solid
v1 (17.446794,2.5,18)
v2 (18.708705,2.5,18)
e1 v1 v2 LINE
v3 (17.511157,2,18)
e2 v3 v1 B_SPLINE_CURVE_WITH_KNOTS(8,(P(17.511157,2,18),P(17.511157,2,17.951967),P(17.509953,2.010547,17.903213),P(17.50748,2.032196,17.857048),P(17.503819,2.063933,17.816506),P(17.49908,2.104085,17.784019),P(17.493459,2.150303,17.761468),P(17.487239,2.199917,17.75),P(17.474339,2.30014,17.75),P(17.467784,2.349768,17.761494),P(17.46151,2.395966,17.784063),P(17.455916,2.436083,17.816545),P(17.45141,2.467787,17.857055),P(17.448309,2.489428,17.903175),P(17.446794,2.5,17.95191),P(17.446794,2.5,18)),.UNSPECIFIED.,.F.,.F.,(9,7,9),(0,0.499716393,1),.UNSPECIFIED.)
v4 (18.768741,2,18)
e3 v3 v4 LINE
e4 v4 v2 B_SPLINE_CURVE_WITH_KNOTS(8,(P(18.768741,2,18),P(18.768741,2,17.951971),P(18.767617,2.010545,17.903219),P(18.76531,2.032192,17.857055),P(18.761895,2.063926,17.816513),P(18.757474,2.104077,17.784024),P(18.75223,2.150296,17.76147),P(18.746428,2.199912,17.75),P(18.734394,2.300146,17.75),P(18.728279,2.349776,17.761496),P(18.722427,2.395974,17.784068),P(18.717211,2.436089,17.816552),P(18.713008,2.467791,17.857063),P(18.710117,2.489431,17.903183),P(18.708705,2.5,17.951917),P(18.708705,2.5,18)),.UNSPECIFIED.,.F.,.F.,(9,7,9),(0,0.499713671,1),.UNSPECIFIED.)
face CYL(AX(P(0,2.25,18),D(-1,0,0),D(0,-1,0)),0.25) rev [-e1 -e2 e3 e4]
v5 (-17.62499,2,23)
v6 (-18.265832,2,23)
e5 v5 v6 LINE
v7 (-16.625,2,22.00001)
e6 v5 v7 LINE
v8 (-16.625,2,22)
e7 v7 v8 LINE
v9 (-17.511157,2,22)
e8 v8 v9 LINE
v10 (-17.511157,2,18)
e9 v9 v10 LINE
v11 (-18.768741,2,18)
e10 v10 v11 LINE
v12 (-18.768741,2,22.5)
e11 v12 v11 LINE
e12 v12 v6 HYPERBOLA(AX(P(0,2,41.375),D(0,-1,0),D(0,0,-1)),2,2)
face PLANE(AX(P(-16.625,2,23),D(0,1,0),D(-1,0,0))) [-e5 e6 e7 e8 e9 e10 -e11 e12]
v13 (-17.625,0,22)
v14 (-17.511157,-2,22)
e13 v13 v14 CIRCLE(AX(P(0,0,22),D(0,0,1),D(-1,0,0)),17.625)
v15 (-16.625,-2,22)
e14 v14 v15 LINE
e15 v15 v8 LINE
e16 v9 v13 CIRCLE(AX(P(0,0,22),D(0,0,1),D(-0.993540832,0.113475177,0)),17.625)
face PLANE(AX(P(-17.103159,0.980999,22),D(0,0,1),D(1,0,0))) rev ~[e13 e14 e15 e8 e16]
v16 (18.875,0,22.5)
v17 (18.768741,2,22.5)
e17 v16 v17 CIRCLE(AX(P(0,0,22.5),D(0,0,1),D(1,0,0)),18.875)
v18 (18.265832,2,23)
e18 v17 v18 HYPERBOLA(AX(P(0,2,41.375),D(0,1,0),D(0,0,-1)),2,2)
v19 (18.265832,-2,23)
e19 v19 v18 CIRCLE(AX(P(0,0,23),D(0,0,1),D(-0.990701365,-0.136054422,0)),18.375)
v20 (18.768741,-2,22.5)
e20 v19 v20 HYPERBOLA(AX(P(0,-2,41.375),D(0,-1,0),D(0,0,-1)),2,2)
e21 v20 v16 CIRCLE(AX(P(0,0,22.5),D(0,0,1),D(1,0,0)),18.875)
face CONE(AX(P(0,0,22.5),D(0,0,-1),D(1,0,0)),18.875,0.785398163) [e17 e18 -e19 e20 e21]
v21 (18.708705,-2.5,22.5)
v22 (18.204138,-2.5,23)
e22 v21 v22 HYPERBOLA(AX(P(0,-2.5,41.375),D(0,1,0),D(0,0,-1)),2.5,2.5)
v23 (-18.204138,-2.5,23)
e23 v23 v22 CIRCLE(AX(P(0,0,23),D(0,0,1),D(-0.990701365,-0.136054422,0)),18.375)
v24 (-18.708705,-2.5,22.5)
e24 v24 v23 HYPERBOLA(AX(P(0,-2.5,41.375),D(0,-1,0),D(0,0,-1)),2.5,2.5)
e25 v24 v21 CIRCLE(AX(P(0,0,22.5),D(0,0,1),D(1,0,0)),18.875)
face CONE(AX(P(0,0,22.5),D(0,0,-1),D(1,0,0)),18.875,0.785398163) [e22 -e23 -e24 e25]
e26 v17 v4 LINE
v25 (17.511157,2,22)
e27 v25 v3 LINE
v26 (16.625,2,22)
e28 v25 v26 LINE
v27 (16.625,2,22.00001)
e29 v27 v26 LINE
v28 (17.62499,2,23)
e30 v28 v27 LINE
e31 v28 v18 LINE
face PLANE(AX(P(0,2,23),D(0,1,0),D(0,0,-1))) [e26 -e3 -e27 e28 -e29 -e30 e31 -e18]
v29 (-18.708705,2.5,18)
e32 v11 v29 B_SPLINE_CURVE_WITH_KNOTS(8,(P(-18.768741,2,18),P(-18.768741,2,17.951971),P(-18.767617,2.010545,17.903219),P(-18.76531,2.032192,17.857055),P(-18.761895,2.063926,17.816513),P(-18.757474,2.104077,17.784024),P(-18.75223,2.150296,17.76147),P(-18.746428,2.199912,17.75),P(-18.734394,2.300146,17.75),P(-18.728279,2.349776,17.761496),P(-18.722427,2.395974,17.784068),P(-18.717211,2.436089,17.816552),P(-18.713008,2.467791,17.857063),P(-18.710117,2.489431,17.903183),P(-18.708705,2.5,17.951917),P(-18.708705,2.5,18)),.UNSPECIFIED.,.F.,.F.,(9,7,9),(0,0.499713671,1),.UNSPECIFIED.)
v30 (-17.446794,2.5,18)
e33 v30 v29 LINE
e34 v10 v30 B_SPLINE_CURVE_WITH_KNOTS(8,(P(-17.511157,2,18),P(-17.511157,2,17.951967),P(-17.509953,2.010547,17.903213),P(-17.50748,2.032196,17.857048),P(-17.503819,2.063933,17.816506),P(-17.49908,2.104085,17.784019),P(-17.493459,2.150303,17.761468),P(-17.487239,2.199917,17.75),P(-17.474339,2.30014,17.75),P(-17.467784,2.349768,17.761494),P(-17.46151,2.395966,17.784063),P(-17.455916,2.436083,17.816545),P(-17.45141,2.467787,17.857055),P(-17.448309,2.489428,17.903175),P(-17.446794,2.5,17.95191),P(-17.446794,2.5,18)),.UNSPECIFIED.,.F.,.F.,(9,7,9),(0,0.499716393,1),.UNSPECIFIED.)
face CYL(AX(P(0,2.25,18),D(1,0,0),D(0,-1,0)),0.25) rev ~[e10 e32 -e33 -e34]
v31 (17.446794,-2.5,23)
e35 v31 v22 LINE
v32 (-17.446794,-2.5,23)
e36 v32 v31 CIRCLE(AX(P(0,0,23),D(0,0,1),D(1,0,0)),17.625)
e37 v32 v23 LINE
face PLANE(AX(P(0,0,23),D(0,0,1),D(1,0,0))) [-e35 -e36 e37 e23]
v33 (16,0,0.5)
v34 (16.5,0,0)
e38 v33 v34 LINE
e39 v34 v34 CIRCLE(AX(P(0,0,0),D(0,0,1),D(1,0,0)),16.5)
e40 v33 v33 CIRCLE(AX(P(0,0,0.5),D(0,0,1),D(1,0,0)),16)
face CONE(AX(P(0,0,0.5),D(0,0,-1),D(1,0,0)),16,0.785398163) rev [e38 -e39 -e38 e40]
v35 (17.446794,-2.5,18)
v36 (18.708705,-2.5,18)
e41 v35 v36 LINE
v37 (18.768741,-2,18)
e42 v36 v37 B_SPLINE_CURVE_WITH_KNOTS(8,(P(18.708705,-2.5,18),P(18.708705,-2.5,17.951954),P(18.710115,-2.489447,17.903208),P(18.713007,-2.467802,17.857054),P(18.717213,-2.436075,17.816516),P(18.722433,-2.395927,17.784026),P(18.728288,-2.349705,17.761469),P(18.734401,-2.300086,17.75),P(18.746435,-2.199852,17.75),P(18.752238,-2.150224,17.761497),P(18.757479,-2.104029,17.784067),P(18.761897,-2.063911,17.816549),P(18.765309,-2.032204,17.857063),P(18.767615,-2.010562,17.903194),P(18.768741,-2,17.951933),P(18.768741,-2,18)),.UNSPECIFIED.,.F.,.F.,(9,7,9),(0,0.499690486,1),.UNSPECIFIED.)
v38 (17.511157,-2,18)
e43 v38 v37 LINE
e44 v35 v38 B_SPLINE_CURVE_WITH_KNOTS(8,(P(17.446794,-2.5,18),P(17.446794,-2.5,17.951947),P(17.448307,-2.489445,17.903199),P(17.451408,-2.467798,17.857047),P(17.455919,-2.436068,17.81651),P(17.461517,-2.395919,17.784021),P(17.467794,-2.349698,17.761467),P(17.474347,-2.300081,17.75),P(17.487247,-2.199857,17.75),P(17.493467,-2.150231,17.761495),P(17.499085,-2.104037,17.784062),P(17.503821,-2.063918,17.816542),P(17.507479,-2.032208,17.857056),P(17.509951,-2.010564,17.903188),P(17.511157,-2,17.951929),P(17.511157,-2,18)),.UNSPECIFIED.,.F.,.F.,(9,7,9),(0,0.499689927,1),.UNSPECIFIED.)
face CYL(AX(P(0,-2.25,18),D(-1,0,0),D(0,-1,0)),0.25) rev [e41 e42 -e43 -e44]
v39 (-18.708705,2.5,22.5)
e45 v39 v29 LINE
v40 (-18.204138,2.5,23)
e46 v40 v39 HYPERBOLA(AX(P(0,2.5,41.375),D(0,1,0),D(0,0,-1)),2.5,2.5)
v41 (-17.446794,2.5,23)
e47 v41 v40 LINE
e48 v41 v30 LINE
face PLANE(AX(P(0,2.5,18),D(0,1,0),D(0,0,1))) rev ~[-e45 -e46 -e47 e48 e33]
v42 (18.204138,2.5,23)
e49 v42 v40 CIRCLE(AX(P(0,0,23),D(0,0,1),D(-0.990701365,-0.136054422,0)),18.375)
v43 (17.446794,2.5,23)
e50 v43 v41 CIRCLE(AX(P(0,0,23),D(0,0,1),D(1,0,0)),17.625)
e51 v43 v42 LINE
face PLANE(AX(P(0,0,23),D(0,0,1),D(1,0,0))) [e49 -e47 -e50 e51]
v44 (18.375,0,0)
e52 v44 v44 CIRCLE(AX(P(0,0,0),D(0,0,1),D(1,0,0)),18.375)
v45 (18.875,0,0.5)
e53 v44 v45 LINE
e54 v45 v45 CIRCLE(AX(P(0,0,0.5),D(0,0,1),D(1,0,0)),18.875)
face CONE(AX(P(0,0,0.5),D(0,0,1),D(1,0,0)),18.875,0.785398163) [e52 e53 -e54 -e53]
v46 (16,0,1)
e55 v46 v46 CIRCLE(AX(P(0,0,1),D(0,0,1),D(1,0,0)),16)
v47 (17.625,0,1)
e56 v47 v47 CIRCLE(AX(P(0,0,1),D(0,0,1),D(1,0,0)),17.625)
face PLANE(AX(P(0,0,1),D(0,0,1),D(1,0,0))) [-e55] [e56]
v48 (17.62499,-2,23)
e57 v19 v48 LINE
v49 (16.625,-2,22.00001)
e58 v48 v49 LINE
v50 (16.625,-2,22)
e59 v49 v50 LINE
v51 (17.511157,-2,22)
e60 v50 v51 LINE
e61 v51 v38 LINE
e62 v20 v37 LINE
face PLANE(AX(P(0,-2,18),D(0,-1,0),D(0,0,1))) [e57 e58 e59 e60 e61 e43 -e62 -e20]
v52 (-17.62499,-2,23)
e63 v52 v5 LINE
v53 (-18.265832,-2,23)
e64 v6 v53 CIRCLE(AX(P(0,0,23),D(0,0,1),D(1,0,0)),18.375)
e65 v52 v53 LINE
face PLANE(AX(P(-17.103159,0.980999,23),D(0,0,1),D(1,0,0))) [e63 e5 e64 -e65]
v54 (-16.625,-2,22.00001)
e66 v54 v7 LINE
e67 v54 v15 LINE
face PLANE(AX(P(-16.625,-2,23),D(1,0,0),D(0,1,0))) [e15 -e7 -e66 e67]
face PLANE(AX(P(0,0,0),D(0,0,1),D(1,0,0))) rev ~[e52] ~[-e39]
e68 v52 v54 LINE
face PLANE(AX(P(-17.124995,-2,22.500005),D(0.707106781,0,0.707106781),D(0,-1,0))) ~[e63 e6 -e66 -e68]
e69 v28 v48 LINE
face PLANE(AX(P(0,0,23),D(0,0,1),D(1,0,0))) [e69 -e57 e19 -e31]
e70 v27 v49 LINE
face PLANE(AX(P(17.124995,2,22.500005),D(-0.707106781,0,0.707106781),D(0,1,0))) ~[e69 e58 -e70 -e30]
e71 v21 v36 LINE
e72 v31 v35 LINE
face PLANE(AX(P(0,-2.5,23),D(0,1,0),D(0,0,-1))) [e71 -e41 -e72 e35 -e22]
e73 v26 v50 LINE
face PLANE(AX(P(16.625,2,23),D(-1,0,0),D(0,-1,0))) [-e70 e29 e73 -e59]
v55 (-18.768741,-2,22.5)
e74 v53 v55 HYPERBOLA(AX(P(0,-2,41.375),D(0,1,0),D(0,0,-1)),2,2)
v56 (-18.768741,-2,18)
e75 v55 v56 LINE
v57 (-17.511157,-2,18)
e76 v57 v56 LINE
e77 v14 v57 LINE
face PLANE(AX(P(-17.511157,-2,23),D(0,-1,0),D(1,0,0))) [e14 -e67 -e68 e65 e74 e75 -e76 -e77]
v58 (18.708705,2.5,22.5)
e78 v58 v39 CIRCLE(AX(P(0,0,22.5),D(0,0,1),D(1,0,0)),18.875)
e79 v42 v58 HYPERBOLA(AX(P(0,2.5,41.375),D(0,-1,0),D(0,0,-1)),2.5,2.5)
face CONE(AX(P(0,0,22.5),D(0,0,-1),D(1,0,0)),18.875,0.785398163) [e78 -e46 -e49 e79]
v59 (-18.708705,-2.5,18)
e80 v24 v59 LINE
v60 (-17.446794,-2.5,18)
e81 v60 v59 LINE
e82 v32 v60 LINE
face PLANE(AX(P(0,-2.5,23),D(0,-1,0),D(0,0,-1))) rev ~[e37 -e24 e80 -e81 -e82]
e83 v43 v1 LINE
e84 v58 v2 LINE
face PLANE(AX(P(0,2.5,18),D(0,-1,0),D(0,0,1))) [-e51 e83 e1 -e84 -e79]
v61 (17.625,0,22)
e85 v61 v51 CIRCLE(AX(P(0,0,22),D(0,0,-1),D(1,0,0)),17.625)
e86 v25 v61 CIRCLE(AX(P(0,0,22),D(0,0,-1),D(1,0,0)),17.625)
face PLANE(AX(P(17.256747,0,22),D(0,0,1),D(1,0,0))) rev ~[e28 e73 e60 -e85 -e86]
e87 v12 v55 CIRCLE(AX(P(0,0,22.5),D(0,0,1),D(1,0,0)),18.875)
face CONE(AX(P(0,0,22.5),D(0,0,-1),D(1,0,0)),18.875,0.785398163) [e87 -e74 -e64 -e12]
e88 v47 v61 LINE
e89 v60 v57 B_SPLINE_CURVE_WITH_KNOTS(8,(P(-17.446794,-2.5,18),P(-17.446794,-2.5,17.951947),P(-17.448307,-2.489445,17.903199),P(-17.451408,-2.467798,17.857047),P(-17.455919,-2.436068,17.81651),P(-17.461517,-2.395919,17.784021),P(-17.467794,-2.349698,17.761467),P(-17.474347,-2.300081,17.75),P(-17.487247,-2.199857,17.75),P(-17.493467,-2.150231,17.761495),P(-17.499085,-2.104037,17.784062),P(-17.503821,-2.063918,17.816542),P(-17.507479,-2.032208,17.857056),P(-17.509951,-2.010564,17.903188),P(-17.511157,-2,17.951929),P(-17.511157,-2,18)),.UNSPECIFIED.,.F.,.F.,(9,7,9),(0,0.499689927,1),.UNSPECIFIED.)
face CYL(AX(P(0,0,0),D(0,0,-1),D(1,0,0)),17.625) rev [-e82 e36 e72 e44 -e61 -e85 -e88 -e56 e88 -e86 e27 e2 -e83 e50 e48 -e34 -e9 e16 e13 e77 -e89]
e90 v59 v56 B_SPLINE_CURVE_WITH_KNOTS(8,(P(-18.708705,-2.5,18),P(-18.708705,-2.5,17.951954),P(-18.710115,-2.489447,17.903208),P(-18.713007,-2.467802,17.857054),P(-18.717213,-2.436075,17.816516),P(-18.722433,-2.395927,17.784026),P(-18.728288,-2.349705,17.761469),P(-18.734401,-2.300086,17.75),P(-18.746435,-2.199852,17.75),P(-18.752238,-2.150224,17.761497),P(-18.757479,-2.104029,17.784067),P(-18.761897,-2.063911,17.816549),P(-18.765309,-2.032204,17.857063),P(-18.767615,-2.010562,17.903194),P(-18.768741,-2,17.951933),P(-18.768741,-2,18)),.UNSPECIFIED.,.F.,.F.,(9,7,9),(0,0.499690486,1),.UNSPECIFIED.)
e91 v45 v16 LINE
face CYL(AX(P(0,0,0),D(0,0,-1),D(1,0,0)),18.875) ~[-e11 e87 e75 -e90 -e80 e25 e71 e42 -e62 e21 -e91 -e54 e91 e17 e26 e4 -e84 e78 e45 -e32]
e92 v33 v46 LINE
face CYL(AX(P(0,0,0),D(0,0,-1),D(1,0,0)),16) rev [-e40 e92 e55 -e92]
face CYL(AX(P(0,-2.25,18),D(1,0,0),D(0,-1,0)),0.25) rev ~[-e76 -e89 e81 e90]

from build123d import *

# Parameters (mm, degrees)
F0_R          = 18.875
F0_R_2        = 17.625
F1_DEPTH      = 23
F0_R_3        = 16
F2_DEPTH      = 1
F3_SIZE       = 0.5
F5_DEPTH      = 25
F5_DEPTH_BACK = 25
F7_DEPTH      = 1
F8_SIZE       = 0.99999


# Not quite as in the source:
# - a fillet or chamfer is up to 0.001 mm smaller than in the source, because OpenCascade refuses the exact size


with BuildPart() as f1:
    # F0 (on Top) → F1 (new body)
    with BuildSketch(Plane.XY):
        Circle(F0_R)
        Circle(F0_R_2, mode=Mode.SUBTRACT)
    extrude(amount=F1_DEPTH)

    # F0 (on Top) → F2 (join)
    with BuildSketch(Plane.XY):
        Circle(F0_R_2)
        Circle(F0_R_3, mode=Mode.SUBTRACT)
    extrude(amount=F2_DEPTH)

    # F3
    f3_edges = [f1.edges().sort_by_distance(p)[0] for p in [
        (-18.875, 0, 0),
        (-16, 0, 0),
        (-18.875, 0, 23),
    ]]
    chamfer(f3_edges, length=F3_SIZE)

    # F4 (on Right) → F5 (cut, two sides)
    with BuildSketch(Plane.YZ) as f5_sk:
        with BuildLine():
            Line((-2.5, 18), (-2, 18))
            ThreePointArc((-2, 18), (-2.25, 18.25), (-2.5, 18))
        make_face()
        with BuildLine():
            ThreePointArc((-2.5, 18), (-2.25, 17.75), (-2, 18))
            Line((-2, 18), (-2.5, 18))
        make_face()
        with BuildLine():
            ThreePointArc((-2.5, 18), (-2.25, 18.25), (-2, 18))
            Line((-2, 18), (-2, 23))
            Line((-2, 23), (-2.5, 23))
            Line((-2.5, 23), (-2.5, 18))
        make_face()
        with BuildLine():
            Line((2.5, 23), (2, 23))
            Line((2, 23), (2, 18))
            ThreePointArc((2, 18), (2.25, 18.25), (2.5, 18))
            Line((2.5, 18), (2.5, 23))
        make_face()
        with BuildLine():
            ThreePointArc((2.5, 18), (2.25, 18.25), (2, 18))
            Line((2, 18), (2.5, 18))
        make_face()
        with BuildLine():
            Line((2.5, 18), (2, 18))
            ThreePointArc((2, 18), (2.25, 17.75), (2.5, 18))
        make_face()
    extrude(amount=-F5_DEPTH, mode=Mode.SUBTRACT)
    extrude(f5_sk.sketch, amount=F5_DEPTH_BACK, mode=Mode.SUBTRACT)

    # F6 (on face) → F7 (join)
    with BuildSketch(Plane.XY.offset(23)):
        with BuildLine():
            ThreePointArc((-17.5111571577, 2), (-17.5965162732, 1.001618714), (-17.625, 0))
            Line((-17.625, 0), (-16.625, 0))
            Line((-16.625, 0), (-16.625, 2))
            Line((-16.625, 2), (-17.5111571577, 2))
        make_face()
        with BuildLine():
            Line((-16.625, 0), (-17.625, 0))
            ThreePointArc((-17.625, 0), (-17.5965162732, -1.001618714), (-17.5111571577, -2))
            Line((-17.5111571577, -2), (-16.625, -2))
            Line((-16.625, -2), (-16.625, 0))
        make_face()
        Polygon((17.8884946657, 2), (17.5111571577, 2), (16.625, 2), (16.625, 0), (16.625, -2), (17.8884946657, -2), align=None)
    extrude(amount=-F7_DEPTH)

    # F8 (size 1 in the source; OpenCascade refuses exactly that, so slightly less here)
    f8_edges = [f1.edges().sort_by_distance(p)[0] for p in [
        (-16.625, 0, 23),
        (16.625, 0, 23),
    ]]
    chamfer(f8_edges, length=F8_SIZE)


solid = f1.part
